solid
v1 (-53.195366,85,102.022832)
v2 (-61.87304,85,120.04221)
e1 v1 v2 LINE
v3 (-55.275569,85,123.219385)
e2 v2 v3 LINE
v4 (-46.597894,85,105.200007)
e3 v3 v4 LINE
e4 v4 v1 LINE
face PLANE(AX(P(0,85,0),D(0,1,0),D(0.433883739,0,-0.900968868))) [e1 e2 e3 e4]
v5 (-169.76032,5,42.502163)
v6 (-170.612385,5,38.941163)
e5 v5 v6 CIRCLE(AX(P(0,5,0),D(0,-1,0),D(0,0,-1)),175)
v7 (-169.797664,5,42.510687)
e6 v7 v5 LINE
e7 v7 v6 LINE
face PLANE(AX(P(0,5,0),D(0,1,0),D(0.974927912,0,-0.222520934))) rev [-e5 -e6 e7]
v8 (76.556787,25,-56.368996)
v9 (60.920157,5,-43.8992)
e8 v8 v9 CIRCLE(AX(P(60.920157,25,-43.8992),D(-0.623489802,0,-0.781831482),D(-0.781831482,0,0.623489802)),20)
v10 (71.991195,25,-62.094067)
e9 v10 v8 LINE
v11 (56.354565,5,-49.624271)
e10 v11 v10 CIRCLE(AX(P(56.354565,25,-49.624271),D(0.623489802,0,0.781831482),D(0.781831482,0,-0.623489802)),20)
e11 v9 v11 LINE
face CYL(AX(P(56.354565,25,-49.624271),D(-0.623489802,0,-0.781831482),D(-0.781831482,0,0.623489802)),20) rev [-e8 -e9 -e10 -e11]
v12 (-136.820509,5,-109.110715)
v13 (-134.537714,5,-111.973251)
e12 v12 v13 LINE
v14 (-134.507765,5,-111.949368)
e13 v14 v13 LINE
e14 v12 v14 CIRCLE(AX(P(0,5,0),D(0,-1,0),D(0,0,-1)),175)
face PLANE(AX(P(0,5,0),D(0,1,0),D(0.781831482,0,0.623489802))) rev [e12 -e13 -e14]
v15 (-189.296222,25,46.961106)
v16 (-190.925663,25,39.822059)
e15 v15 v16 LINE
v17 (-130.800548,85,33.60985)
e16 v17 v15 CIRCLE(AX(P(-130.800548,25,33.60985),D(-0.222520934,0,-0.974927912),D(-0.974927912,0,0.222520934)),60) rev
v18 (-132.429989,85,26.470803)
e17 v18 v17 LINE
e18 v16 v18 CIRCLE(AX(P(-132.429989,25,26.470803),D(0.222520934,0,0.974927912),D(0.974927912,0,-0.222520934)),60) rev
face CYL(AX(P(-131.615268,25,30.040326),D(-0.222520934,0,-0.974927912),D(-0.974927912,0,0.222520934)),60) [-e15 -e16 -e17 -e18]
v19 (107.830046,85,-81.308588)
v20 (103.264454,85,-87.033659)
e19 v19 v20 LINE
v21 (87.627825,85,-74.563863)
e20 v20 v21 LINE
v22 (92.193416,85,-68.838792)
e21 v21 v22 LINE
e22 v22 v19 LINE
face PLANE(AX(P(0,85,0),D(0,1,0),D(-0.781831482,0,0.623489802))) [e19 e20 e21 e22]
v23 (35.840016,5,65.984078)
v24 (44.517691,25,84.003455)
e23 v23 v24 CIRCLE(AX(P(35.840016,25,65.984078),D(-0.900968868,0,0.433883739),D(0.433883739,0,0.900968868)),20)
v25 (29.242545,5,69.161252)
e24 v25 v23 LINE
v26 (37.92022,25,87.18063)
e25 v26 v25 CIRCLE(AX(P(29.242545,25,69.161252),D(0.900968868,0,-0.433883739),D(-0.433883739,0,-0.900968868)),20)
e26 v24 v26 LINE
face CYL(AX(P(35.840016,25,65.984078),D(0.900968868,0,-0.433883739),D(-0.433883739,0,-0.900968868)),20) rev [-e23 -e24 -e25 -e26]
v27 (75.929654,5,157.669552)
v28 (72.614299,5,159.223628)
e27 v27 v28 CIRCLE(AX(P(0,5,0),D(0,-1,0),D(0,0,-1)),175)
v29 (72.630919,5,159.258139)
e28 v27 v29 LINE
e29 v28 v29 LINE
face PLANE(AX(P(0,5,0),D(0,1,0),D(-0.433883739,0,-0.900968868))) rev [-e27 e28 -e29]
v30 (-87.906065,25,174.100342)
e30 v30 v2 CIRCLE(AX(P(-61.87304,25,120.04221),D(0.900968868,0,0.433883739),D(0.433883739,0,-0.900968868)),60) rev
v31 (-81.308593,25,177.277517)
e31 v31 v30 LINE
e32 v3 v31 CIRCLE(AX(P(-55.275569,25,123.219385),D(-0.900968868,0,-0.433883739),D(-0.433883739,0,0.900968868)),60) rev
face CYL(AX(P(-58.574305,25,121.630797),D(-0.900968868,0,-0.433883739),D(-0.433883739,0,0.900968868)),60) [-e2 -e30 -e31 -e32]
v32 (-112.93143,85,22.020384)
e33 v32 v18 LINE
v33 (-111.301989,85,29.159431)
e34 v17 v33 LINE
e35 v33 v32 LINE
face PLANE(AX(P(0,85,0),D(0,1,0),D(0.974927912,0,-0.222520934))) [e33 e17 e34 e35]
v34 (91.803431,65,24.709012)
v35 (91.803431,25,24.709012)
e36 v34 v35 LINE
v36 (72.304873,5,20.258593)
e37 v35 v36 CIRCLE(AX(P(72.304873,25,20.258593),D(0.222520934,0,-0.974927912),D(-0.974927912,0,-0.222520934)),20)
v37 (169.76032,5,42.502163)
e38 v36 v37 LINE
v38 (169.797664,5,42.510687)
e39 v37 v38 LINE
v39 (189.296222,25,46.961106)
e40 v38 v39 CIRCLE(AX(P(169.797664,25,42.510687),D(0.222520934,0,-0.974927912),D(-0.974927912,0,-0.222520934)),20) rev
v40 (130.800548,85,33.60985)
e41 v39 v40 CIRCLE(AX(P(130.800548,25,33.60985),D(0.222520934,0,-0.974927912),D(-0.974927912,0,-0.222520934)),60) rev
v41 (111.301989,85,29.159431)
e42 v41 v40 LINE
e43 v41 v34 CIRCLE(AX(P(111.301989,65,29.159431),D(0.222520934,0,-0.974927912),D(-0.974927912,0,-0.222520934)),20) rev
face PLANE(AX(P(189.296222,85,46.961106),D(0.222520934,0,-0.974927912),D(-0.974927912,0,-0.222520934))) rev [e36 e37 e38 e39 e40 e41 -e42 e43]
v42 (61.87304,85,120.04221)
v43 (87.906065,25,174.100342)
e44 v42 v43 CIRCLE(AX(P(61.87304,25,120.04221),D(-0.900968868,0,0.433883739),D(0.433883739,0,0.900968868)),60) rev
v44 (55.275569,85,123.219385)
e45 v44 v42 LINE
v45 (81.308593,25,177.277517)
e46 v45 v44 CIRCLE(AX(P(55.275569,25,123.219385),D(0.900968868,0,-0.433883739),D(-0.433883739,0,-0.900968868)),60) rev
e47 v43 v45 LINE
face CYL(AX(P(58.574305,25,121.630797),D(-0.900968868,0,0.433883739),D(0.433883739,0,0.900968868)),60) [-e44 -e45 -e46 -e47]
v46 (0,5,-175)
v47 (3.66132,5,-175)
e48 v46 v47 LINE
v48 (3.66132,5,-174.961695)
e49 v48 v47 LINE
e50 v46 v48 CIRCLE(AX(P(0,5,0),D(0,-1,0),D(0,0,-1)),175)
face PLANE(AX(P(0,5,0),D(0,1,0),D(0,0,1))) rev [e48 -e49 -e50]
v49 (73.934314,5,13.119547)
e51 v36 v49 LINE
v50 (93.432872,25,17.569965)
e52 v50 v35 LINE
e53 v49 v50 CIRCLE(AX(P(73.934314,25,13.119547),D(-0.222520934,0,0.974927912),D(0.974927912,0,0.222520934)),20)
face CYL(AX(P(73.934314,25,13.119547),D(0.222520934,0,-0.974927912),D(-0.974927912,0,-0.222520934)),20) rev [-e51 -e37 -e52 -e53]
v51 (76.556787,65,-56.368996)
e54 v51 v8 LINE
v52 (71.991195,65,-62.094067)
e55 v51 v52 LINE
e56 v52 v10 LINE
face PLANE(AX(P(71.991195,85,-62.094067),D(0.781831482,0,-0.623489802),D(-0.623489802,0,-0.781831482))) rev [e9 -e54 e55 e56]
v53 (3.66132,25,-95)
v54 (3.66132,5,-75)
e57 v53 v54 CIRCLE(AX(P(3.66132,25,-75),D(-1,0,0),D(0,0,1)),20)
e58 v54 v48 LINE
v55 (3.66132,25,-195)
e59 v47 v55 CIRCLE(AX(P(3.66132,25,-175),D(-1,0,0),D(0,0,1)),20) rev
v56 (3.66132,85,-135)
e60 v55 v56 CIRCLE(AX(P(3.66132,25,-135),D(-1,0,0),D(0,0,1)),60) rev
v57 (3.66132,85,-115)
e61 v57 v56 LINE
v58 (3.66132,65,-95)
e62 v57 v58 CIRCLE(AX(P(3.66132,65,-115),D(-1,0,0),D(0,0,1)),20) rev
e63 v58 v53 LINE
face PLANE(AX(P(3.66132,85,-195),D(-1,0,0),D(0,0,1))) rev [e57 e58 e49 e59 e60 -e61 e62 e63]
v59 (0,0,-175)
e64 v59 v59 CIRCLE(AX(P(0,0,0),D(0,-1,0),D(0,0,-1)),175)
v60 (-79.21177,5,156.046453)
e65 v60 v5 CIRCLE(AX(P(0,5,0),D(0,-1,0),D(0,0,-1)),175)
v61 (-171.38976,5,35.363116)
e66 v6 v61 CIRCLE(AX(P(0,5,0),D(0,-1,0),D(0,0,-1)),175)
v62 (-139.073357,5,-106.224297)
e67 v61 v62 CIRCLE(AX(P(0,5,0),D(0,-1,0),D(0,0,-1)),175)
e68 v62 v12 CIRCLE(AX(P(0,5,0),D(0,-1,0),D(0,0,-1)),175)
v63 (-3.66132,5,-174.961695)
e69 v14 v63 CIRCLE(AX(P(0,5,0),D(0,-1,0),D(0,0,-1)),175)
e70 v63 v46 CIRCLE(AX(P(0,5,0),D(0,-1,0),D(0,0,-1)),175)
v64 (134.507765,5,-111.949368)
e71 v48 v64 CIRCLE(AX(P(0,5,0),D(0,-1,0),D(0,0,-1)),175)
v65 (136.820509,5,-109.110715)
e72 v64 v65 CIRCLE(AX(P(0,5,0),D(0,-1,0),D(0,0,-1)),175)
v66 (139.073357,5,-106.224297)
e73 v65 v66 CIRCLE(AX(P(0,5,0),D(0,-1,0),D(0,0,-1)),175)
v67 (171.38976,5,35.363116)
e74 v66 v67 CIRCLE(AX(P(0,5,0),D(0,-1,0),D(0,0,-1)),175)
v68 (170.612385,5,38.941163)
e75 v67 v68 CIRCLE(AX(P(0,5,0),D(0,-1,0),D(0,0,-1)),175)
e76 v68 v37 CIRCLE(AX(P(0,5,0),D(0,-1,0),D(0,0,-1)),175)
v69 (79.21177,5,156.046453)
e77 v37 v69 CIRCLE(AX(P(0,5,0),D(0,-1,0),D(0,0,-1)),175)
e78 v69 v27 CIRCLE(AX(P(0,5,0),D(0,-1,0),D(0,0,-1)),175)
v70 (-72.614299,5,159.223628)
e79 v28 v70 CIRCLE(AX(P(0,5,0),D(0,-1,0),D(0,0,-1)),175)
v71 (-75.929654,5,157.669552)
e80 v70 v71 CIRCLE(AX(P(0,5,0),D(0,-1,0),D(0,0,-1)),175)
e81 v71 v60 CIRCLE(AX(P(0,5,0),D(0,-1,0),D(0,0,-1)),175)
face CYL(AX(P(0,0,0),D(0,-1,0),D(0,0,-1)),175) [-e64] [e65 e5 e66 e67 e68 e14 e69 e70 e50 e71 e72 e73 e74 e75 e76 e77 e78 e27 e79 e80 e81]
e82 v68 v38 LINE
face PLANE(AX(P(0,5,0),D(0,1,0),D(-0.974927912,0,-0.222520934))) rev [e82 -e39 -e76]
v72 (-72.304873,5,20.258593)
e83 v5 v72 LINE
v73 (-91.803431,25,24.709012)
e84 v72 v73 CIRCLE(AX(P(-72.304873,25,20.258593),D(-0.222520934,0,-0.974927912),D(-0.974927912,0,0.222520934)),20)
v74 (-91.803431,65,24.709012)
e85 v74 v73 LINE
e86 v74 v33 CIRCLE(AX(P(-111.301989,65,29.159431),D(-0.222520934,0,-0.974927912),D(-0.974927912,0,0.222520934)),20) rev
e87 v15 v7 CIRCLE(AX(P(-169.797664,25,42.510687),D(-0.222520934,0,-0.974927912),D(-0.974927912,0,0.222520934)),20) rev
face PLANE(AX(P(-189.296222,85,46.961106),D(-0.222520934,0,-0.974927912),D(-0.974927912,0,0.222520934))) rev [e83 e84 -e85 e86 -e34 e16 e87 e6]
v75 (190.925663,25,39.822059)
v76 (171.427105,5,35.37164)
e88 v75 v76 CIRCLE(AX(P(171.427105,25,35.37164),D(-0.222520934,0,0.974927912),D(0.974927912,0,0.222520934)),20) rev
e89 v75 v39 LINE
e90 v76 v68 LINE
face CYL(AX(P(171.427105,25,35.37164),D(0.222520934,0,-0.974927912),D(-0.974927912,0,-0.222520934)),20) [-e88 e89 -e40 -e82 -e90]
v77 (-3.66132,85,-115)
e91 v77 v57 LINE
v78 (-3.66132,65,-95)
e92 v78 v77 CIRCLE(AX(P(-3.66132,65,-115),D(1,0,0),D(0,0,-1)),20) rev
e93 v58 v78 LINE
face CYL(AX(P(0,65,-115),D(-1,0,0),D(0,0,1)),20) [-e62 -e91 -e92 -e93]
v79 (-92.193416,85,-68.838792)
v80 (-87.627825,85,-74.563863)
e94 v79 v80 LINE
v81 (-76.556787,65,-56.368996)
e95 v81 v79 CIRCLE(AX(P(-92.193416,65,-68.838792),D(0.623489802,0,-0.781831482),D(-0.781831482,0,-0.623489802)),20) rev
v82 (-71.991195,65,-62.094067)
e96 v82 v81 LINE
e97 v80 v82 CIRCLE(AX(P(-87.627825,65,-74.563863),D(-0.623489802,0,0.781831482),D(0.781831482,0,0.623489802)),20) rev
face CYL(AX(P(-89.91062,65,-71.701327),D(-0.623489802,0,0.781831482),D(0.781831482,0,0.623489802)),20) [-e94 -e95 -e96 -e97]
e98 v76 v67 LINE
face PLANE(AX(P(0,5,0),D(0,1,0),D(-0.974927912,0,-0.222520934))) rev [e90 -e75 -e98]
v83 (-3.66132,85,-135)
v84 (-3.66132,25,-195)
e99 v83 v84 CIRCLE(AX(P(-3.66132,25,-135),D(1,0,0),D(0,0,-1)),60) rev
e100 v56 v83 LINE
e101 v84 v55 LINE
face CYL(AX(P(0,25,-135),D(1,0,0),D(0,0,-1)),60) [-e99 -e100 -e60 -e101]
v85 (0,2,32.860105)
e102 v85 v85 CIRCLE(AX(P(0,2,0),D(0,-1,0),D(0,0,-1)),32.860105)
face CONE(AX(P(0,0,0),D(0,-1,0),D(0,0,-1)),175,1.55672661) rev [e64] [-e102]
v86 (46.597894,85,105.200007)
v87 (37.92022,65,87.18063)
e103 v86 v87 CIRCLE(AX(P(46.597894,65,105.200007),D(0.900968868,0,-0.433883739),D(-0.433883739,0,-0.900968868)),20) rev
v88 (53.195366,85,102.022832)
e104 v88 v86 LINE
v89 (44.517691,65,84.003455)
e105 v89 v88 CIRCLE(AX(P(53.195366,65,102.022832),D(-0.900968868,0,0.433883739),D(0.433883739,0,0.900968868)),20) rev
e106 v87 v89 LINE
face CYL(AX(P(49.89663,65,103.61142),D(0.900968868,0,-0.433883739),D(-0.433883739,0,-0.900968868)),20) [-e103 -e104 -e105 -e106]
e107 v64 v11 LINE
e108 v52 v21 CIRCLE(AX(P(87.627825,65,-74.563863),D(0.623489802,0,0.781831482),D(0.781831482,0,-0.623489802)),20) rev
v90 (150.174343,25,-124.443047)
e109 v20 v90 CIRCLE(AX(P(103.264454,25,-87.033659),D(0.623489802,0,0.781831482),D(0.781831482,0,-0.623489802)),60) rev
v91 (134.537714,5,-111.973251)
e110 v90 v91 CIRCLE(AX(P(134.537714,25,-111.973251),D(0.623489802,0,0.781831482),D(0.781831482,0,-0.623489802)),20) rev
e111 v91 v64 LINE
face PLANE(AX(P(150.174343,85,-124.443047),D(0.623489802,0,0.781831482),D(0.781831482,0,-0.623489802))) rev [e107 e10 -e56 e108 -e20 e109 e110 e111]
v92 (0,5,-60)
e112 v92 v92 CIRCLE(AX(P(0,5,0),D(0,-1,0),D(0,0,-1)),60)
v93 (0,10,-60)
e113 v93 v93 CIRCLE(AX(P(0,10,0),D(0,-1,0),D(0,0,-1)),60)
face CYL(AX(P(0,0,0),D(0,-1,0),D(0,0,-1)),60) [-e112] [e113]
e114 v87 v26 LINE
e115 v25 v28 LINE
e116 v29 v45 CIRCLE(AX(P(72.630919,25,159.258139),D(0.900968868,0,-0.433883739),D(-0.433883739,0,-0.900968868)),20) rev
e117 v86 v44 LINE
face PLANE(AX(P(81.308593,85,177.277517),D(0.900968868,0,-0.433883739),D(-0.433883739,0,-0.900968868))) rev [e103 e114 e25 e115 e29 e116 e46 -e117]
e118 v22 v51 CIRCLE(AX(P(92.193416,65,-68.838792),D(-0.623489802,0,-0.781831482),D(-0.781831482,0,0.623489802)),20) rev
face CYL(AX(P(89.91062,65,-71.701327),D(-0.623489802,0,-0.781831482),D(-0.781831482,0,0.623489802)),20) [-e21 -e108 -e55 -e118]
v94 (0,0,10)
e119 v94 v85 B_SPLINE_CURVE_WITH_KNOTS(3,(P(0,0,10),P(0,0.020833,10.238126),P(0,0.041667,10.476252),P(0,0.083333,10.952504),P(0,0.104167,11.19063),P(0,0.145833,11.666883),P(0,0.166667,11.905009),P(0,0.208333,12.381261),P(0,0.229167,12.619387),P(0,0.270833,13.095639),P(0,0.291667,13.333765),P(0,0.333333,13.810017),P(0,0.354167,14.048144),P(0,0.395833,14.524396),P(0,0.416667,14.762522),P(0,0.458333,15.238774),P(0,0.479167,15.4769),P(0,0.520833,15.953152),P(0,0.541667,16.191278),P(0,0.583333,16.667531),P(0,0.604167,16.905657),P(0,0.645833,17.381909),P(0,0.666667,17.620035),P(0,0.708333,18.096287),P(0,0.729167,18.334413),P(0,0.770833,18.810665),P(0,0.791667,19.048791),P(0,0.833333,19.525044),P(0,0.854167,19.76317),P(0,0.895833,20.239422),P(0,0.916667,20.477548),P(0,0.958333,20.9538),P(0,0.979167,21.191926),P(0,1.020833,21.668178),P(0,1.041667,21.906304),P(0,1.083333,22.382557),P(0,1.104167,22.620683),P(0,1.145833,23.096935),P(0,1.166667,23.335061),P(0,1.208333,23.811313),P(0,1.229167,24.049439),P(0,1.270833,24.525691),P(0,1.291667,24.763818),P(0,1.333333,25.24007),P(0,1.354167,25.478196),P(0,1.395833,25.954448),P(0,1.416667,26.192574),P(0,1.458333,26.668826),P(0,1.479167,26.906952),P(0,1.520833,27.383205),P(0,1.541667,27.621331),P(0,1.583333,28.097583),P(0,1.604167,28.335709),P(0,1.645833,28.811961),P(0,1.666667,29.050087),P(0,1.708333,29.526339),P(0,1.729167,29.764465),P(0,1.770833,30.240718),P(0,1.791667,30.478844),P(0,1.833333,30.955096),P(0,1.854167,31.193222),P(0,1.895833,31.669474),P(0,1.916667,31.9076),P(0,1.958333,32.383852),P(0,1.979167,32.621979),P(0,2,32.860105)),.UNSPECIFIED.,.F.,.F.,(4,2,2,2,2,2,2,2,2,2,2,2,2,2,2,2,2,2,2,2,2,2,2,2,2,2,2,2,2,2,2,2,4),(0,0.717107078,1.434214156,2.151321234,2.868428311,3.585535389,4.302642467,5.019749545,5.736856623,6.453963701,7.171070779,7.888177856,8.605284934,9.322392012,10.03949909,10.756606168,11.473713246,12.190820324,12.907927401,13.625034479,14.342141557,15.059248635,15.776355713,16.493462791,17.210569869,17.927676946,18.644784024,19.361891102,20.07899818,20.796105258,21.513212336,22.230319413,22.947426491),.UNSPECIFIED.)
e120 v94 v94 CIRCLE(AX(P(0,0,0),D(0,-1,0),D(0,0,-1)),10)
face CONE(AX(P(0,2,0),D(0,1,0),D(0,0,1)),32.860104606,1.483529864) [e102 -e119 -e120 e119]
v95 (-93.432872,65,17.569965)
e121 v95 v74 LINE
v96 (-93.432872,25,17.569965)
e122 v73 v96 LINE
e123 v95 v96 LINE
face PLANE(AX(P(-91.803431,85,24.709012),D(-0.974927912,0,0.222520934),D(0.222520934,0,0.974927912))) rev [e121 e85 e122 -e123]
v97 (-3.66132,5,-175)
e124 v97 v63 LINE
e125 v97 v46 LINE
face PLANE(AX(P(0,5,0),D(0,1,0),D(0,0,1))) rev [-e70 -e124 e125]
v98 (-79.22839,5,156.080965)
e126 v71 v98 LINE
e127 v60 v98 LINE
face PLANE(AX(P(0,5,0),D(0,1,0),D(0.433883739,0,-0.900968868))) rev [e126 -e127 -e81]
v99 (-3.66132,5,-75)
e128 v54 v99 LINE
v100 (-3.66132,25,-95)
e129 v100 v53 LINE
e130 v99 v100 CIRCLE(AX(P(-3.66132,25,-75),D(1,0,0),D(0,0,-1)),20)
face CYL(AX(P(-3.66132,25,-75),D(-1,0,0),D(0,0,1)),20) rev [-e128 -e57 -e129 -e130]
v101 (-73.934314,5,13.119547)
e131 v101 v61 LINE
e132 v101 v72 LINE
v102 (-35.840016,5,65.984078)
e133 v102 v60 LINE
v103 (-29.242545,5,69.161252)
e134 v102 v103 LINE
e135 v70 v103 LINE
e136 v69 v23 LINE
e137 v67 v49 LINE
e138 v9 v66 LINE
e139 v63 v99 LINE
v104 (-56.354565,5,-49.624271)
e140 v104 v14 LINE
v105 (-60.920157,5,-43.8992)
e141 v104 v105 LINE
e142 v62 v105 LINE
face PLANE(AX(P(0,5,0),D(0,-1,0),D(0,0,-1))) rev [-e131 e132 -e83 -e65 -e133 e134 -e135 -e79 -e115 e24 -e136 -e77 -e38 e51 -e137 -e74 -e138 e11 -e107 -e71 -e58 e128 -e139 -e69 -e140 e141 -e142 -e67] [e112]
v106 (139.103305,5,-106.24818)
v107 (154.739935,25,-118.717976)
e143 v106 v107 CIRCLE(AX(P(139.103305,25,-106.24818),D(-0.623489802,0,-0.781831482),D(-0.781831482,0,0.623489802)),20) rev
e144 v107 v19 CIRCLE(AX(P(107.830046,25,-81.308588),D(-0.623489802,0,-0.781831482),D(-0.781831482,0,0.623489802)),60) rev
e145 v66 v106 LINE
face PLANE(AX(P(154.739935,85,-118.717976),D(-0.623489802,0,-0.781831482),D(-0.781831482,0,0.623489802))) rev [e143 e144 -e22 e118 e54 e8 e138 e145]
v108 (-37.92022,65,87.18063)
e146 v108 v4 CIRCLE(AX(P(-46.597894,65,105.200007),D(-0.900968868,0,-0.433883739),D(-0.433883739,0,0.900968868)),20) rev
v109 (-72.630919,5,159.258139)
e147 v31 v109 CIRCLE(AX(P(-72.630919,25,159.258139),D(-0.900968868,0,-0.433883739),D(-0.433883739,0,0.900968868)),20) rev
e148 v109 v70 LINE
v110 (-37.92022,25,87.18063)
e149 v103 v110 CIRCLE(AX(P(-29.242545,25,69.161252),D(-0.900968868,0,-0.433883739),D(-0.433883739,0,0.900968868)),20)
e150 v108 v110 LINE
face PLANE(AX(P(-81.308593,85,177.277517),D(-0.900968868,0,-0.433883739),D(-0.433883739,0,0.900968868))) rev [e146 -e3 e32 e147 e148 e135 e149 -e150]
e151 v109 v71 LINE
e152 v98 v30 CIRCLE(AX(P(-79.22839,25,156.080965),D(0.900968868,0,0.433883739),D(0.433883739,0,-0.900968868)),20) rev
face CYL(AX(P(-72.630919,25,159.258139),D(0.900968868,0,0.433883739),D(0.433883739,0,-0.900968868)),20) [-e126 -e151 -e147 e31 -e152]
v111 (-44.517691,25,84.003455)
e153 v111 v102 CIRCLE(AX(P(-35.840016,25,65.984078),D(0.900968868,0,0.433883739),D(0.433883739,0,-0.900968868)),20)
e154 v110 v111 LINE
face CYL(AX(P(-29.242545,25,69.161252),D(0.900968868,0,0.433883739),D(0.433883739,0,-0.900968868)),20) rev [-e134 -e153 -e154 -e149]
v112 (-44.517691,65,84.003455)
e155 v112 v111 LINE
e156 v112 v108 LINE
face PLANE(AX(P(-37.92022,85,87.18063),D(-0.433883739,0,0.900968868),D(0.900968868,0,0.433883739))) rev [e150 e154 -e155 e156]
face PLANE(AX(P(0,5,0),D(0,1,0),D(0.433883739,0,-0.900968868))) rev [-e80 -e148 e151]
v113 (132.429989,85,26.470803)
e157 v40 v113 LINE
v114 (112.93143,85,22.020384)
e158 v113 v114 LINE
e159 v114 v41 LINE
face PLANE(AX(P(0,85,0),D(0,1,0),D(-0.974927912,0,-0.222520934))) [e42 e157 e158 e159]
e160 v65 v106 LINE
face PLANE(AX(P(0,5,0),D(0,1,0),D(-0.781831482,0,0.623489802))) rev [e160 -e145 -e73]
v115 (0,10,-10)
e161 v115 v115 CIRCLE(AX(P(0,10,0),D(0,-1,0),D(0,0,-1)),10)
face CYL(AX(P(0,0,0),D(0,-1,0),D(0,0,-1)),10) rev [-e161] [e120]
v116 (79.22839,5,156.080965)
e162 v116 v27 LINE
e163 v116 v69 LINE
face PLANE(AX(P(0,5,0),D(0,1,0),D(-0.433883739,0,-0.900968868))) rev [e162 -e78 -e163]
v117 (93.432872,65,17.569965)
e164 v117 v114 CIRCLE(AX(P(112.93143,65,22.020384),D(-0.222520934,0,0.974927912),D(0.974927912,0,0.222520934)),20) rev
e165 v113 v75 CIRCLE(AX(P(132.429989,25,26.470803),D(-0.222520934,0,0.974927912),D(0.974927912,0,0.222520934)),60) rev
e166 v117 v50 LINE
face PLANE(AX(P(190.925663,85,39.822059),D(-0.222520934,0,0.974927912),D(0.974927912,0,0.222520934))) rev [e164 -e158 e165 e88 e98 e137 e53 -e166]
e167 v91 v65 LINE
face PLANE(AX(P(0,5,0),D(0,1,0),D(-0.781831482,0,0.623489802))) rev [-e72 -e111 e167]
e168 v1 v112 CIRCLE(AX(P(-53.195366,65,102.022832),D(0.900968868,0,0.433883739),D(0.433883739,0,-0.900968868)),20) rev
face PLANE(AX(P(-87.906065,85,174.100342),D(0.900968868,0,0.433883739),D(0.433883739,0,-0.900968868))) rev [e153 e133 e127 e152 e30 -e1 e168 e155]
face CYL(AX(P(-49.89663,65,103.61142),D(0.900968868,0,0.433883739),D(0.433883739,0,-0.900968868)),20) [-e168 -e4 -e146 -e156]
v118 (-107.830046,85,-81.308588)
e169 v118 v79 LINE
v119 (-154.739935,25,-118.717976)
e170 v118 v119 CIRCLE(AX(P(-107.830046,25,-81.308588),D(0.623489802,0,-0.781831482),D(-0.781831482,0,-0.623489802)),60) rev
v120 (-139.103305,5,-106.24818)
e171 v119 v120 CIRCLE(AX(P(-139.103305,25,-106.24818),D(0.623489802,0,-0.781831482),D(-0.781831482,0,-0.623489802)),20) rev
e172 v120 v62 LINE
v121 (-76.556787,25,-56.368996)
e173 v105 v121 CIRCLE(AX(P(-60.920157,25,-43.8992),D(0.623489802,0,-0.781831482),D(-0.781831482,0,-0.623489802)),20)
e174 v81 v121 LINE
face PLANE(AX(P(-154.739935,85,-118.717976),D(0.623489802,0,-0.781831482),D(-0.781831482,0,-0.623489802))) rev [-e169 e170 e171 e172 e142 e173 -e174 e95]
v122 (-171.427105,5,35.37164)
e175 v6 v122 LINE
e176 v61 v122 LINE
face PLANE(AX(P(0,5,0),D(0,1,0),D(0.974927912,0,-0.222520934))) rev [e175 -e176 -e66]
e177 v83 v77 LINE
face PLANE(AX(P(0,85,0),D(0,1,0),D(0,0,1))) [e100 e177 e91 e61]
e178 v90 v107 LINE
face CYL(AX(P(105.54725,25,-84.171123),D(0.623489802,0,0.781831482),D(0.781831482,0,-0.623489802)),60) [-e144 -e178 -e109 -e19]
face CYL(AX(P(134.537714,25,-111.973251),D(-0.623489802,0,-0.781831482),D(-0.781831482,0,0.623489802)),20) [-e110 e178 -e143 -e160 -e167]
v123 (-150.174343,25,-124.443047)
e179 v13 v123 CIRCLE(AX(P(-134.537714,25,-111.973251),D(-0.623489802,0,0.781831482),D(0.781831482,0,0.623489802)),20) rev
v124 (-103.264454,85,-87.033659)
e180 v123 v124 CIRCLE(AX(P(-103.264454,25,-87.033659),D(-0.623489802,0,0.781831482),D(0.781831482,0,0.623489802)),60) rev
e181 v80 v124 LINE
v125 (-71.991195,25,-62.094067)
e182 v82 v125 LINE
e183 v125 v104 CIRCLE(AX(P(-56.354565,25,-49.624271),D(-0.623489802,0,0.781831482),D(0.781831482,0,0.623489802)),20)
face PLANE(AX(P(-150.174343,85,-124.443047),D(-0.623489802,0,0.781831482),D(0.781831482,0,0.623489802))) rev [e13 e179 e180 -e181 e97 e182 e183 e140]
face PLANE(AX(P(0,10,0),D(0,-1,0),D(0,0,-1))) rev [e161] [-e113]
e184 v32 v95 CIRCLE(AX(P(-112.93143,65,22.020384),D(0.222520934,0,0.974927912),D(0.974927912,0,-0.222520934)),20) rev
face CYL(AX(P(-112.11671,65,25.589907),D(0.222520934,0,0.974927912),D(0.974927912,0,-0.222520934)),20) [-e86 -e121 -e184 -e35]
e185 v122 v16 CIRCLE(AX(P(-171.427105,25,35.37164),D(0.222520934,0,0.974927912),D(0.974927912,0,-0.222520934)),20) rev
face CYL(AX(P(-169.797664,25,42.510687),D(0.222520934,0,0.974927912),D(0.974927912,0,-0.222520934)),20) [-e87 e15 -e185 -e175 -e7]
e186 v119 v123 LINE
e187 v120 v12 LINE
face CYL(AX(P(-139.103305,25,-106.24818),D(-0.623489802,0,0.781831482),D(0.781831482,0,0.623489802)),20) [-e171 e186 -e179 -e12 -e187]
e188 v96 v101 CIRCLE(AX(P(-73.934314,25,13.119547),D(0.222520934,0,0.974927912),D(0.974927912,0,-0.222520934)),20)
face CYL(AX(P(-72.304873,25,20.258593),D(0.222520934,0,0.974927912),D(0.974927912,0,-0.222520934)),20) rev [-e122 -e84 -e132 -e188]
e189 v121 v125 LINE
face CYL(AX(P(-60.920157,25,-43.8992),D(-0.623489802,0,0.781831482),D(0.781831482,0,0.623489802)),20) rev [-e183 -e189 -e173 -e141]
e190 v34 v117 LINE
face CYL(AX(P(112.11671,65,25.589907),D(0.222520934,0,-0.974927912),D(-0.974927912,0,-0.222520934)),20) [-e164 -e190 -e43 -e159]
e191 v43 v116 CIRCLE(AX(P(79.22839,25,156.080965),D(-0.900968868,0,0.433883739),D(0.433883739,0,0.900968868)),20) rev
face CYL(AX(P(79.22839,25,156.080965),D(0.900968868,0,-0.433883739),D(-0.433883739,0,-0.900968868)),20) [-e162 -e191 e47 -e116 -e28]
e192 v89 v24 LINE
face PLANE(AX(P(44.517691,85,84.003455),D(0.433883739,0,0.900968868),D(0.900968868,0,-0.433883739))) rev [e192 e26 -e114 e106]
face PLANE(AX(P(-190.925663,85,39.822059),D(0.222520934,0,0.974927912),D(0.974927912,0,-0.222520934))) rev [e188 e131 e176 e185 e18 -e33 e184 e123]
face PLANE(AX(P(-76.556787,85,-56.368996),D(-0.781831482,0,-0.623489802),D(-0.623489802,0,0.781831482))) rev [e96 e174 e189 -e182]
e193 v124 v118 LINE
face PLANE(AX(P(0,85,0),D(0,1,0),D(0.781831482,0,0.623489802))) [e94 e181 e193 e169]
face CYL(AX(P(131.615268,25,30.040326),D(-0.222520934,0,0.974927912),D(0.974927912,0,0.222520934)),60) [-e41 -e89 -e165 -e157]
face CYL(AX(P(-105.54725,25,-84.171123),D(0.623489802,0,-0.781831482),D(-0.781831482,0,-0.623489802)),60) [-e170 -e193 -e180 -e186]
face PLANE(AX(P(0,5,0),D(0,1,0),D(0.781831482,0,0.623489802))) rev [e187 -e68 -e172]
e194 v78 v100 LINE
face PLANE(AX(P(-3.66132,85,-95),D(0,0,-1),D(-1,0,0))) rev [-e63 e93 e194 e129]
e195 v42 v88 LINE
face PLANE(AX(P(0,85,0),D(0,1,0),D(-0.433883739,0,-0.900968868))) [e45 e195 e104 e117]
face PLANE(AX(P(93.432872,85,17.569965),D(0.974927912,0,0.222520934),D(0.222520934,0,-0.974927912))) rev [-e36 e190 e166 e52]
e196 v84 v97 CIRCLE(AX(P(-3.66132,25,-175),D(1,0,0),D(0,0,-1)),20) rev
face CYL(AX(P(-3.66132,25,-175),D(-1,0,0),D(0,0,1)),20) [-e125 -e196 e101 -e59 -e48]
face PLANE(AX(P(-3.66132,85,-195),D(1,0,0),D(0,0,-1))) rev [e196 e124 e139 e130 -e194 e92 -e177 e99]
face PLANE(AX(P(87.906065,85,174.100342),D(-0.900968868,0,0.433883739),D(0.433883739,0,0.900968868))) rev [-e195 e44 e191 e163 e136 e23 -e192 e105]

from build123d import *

# Parameters (mm, degrees)
SKETCH3_W                = 7.322640784
SKETCH3_H                = 100
BOSS_EXTRUDE1_DEPTH      = 80
FILLET1_R                = 60
FILLET2_R                = 20
FILLET3_R                = 20
FILLET4_R                = 20
CIRPATTERN2_COUNT        = 7
FILLET1_OF_CIRPATTERN2_R = 60
FILLET2_OF_CIRPATTERN2_R = 20
FILLET3_OF_CIRPATTERN2_R = 20
FILLET4_OF_CIRPATTERN2_R = 20


with BuildPart() as part:
    # Sketch2 → Revolve2 (revolve)
    with BuildSketch(Plane(origin=(0, 0, 0), x_dir=(0, 0, -1), z_dir=(1, 0, 0))):
        Polygon((32.860104606, 2), (10, 0), (10, 10), (60, 10), (60, 5), (175, 5), (175, 0), align=None)
    revolve(axis=Axis((0, 0, 0), (0, 1, 0)))

    # Sketch3 → Boss-Extrude1 (add)
    with BuildSketch(Plane(origin=(0, 5, 0), x_dir=(1, 0, 0), z_dir=(0, 1, 0))):
        with Locations((0, 145)):
            Rectangle(SKETCH3_W, SKETCH3_H)
    boss_extrude1 = extrude(amount=BOSS_EXTRUDE1_DEPTH)

    # Fillet1
    fillet1_edges = [part.edges().sort_by_distance(p)[0] for p in [
        (0, 85, -195),
    ]]
    fillet(fillet1_edges, radius=FILLET1_R)

    # Fillet2
    fillet2_edges = [part.edges().sort_by_distance(p)[0] for p in [
        (0, 5, -195),
    ]]
    fillet(fillet2_edges, radius=FILLET2_R - 0.0001)  # a hair under: the kernel refuses the full size

    # Fillet3
    fillet3_edges = [part.edges().sort_by_distance(p)[0] for p in [
        (0, 85, -95),
    ]]
    fillet(fillet3_edges, radius=FILLET3_R)

    # Fillet4
    fillet4_edges = [part.edges().sort_by_distance(p)[0] for p in [
        (0, 5, -95),
    ]]
    fillet(fillet4_edges, radius=FILLET4_R)

    # CirPattern2: Boss-Extrude1 ×7 about axis
    cirpattern2_axis = Axis((0, 0, 0), (0, 1, 0))
    for i in range(1, CIRPATTERN2_COUNT):
        add(boss_extrude1.rotate(cirpattern2_axis, i * 360 / CIRPATTERN2_COUNT))

    # Fillet1 of CirPattern2
    fillet1_of_cirpattern2_edges = [part.edges().sort_by_distance(p)[0] for p in [
        (-152.457139081, 85, -121.580511362),
        (-190.110942875, 85, 43.391582121),
        (-84.607329128, 85, 175.688929241),
        (84.607329128, 85, 175.688929241),
        (190.110942875, 85, 43.391582121),
        (152.457139081, 85, -121.580511362),
    ]]
    fillet(fillet1_of_cirpattern2_edges, radius=FILLET1_OF_CIRPATTERN2_R)

    # Fillet2 of CirPattern2
    fillet2_of_cirpattern2_edges = [part.edges().sort_by_distance(p)[0] for p in [
        (-152.457139081, 5, -121.580511362),
        (-190.110942875, 5, 43.391582121),
        (-84.607329128, 5, 175.688929241),
        (84.607329128, 5, 175.688929241),
        (190.110942875, 5, 43.391582121),
        (152.457139081, 5, -121.580511362),
    ]]
    fillet(fillet2_of_cirpattern2_edges, radius=FILLET2_OF_CIRPATTERN2_R - 0.0001)  # a hair under: the kernel refuses the full size

    # Fillet3 of CirPattern2
    fillet3_of_cirpattern2_edges = [part.edges().sort_by_distance(p)[0] for p in [
        (-74.273990834, 85, -59.231531177),
        (-92.618151657, 85, 21.139488726),
        (-41.218955216, 85, 85.592042451),
        (41.218955216, 85, 85.592042451),
        (92.618151657, 85, 21.139488726),
        (74.273990834, 85, -59.231531177),
    ]]
    fillet(fillet3_of_cirpattern2_edges, radius=FILLET3_OF_CIRPATTERN2_R)

    # Fillet4 of CirPattern2
    fillet4_of_cirpattern2_edges = [part.edges().sort_by_distance(p)[0] for p in [
        (-74.273990834, 5, -59.231531177),
        (-92.618151657, 5, 21.139488726),
        (-41.218955216, 5, 85.592042451),
        (41.218955216, 5, 85.592042451),
        (92.618151657, 5, 21.139488726),
        (74.273990834, 5, -59.231531177),
    ]]
    fillet(fillet4_of_cirpattern2_edges, radius=FILLET4_OF_CIRPATTERN2_R)


solid = part.part
